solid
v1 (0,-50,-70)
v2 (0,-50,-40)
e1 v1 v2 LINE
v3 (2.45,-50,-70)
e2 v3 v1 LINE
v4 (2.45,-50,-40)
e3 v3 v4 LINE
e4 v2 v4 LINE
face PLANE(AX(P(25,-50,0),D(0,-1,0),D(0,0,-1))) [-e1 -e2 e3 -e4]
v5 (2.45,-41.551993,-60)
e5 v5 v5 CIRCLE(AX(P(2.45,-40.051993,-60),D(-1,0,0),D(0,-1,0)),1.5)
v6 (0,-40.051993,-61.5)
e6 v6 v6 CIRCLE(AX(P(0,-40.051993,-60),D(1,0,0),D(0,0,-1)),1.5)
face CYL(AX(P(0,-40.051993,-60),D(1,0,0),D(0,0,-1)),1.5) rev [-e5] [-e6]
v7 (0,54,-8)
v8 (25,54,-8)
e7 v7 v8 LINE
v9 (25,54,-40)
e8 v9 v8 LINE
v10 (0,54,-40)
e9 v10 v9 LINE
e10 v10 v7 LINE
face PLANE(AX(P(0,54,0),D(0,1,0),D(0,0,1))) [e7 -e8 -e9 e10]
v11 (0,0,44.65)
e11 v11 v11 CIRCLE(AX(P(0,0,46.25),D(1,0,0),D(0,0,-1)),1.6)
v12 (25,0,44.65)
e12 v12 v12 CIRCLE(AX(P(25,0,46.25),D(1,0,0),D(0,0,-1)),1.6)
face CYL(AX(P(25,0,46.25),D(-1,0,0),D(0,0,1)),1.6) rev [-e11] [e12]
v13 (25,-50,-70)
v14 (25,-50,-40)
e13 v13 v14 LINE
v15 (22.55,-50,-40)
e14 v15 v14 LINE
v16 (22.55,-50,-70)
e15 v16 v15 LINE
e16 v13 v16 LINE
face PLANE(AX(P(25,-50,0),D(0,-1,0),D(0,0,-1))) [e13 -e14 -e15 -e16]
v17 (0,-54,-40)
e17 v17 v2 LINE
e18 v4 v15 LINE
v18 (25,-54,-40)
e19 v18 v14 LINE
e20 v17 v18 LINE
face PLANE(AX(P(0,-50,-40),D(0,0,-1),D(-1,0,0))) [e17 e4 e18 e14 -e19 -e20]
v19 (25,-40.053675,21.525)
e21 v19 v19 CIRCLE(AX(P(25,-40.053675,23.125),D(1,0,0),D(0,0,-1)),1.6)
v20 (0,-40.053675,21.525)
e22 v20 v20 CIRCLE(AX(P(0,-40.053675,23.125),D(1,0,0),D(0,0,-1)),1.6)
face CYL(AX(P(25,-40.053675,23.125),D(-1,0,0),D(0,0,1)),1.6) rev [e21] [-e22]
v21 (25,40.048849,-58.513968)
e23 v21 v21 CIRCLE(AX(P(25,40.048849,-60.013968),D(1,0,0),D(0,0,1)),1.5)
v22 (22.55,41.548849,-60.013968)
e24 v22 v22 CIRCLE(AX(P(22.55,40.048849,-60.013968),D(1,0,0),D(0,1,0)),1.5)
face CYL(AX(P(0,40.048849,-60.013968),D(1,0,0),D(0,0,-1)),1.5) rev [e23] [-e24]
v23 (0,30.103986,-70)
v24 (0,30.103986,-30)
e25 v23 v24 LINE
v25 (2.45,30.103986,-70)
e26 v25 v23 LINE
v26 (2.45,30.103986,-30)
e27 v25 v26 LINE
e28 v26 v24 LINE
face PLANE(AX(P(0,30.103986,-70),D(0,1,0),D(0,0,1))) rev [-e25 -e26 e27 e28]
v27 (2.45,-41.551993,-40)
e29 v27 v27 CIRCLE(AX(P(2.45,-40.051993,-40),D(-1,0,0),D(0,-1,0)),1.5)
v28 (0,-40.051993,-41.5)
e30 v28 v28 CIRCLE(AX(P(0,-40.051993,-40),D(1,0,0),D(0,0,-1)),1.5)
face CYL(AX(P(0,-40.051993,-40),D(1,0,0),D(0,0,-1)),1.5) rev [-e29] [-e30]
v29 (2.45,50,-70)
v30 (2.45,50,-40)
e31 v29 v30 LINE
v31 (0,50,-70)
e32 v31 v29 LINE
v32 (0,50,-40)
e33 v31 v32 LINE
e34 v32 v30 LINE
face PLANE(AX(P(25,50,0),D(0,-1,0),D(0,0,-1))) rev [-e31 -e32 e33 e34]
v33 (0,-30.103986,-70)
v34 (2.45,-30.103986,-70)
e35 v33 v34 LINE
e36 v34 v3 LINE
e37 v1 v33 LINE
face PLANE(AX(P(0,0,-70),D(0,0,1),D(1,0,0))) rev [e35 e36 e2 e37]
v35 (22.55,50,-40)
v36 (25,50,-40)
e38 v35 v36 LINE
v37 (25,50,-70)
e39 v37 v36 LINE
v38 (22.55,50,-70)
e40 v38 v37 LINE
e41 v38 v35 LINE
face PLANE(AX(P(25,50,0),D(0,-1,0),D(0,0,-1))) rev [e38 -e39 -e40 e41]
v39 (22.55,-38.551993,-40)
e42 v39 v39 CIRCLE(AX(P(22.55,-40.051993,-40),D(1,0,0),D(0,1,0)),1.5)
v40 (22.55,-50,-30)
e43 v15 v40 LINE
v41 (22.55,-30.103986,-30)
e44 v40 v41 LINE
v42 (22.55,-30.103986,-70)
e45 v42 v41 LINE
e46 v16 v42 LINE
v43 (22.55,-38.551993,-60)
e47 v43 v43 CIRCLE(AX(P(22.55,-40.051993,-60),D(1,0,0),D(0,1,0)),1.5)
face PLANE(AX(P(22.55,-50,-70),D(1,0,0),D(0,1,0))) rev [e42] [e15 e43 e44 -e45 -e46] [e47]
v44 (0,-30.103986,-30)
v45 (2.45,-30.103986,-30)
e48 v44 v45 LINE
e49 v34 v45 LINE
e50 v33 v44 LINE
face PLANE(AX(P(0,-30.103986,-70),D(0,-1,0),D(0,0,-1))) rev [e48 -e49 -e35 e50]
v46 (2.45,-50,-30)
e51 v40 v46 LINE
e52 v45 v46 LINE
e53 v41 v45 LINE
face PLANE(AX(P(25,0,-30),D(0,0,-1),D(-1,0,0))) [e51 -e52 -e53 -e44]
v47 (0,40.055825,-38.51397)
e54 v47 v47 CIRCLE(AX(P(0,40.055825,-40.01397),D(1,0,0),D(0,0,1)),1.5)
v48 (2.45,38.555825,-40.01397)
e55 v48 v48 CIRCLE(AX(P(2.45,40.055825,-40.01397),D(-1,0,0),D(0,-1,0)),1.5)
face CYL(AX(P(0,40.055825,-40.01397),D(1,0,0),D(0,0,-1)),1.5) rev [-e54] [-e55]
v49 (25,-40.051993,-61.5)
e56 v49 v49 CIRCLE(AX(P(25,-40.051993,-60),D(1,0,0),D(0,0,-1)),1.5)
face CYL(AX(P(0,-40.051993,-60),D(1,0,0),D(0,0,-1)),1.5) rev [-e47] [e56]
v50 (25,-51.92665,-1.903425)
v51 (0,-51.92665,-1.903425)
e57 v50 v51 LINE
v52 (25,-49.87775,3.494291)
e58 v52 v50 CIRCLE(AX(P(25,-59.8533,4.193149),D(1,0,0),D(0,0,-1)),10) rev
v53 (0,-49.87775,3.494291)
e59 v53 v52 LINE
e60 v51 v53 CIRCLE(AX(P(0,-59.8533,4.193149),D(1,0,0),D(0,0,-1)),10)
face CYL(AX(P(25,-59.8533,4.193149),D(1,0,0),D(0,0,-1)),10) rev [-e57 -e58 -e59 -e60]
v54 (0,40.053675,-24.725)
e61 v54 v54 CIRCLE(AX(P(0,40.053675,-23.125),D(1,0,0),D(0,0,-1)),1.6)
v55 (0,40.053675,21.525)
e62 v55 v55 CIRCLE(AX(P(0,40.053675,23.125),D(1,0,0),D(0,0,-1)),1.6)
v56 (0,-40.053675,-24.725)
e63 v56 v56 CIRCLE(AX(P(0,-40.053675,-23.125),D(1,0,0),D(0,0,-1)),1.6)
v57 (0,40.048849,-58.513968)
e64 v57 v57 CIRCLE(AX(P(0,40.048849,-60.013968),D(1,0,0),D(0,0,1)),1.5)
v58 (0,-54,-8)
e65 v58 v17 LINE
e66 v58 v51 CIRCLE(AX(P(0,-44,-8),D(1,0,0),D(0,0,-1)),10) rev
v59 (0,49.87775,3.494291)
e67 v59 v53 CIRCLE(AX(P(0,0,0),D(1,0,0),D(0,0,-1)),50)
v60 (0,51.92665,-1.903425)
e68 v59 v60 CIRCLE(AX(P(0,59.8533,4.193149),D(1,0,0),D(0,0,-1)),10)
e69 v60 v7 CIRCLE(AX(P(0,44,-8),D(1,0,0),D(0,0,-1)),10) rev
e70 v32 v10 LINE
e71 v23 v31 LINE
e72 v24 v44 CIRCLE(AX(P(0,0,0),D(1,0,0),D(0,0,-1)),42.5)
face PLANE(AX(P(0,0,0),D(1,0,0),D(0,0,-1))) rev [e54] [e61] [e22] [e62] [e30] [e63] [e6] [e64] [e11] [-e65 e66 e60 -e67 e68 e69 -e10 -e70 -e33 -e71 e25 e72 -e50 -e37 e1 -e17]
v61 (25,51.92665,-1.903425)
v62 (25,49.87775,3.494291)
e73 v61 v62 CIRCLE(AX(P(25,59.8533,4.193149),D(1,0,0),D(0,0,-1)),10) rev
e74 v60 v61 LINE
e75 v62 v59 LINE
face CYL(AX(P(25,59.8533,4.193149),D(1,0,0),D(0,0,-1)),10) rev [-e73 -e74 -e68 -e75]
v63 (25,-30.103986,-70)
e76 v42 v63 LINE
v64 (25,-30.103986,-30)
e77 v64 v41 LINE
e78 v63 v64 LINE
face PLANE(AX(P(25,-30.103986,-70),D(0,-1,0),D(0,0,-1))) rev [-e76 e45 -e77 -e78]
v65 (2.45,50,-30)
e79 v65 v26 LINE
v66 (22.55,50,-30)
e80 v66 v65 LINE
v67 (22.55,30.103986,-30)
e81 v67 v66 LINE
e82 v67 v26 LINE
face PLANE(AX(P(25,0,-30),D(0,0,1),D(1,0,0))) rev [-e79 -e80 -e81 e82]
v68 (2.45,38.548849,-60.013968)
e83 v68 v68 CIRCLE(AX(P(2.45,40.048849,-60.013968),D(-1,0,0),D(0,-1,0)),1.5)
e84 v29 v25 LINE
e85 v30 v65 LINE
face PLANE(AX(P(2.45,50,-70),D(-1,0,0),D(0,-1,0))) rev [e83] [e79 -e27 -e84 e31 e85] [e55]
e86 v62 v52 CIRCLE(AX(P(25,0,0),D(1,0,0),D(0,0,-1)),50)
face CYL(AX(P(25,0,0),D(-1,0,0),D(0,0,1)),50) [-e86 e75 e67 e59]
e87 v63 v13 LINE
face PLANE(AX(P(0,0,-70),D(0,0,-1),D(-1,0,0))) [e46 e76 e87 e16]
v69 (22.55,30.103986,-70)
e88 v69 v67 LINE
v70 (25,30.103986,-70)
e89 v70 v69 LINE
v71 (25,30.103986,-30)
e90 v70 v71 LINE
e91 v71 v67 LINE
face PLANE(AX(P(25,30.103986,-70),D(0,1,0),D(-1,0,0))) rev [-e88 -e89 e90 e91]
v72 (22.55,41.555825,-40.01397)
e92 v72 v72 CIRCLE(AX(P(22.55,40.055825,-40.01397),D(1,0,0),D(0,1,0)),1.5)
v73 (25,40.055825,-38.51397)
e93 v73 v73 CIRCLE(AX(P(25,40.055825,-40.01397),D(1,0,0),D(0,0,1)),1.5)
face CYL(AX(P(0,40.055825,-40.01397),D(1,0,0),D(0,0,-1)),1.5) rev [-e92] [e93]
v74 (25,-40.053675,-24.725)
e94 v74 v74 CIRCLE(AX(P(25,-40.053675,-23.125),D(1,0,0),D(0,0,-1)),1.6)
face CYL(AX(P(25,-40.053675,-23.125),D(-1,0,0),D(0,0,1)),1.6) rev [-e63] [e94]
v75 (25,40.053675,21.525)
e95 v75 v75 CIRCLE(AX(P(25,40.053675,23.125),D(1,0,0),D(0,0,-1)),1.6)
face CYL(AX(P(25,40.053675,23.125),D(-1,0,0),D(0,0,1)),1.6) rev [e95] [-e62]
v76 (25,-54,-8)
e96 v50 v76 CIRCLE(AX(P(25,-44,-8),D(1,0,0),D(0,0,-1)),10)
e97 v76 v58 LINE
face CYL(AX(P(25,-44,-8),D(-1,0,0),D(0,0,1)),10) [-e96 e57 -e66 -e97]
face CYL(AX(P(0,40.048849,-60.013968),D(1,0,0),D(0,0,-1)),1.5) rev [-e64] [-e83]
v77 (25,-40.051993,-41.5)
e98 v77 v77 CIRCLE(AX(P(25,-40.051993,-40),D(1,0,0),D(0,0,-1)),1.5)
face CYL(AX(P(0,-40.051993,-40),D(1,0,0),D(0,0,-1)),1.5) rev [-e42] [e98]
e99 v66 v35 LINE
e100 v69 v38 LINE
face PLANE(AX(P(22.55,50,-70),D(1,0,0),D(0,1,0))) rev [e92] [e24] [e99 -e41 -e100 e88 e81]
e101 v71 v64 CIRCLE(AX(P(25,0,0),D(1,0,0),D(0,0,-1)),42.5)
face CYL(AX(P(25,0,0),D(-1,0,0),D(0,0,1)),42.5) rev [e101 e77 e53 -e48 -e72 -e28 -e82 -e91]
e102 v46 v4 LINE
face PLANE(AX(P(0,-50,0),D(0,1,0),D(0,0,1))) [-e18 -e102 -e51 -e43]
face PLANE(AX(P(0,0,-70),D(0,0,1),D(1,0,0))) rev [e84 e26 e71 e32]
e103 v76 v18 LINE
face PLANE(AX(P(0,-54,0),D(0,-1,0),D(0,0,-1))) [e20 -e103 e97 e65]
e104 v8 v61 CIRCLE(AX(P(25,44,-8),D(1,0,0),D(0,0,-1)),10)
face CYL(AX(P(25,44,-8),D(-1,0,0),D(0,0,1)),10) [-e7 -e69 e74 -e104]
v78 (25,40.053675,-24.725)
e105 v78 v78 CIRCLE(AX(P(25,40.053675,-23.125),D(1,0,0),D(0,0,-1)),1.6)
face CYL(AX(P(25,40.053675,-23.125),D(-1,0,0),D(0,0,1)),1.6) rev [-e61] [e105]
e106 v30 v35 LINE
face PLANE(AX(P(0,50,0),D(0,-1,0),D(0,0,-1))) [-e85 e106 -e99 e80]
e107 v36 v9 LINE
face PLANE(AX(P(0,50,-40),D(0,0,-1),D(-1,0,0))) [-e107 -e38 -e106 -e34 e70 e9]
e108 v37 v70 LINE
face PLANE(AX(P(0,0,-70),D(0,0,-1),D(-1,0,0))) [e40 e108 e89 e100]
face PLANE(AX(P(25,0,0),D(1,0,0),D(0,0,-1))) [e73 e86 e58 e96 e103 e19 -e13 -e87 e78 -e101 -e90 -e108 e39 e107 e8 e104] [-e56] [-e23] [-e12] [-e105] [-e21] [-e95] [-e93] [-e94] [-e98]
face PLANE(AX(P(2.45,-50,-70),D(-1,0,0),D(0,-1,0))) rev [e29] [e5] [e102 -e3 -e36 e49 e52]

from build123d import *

# Parameters (mm, degrees)
SKETCH_1_R          = 1.6
EXTRUDE_1_DEPTH     = 25
SKETCH_2_W          = 2.45
SKETCH_2_H          = 19.896013553
EXTRUDE_2_DEPTH     = 40
SKETCH_3_R          = 1.5
CUT_EXTRUDE_1_DEPTH = 90.582364336
SKETCH_4_W          = 40
SKETCH_4_H          = 4
EXTRUDE_3_DEPTH     = 25
FILLET_4_R          = 10
FILLET_5_R          = 10


with BuildPart() as part:
    # 草图1 → 凸台-拉伸1 (new body)
    # profile 1 of 2: a face of its own
    with BuildSketch(Plane(origin=(0, 0, 0), x_dir=(0, 0, -1), z_dir=(1, 0, 0))):
        with BuildLine():
            ThreePointArc((-47.85, 0), (-46.25, 1.6), (-44.65, 0))
            Line((-44.65, 0), (-42.5, 0))
            ThreePointArc((-42.5, 0), (-16.298006013, 39.25079617), (30, 30.103986447))
            Line((30, 30.103986447), (30, 50))
            Line((30, 50), (0, 50))
            ThreePointArc((0, 50), (-35.355339059, 35.355339059), (-50, 0))
            Line((-50, 0), (-47.85, 0))
        make_face()
        with Locations((-23.125, 40.053674925)):
            Circle(SKETCH_1_R, mode=Mode.SUBTRACT)
        with Locations((23.125, 40.053674925)):
            Circle(SKETCH_1_R, mode=Mode.SUBTRACT)
    # profile 2 of 2: a face of its own
    with BuildSketch(Plane(origin=(0, 0, 0), x_dir=(0, 0, -1), z_dir=(1, 0, 0))):
        with BuildLine():
            Line((-42.5, 0), (-44.65, 0))
            ThreePointArc((-44.65, 0), (-46.25, -1.6), (-47.85, 0))
            Line((-47.85, 0), (-50, 0))
            ThreePointArc((-50, 0), (-35.355339059, -35.355339059), (0, -50))
            Line((0, -50), (30, -50))
            Line((30, -50), (30, -30.103986447))
            ThreePointArc((30, -30.103986447), (-16.298006013, -39.25079617), (-42.5, 0))
        make_face()
        with Locations((-23.125, -40.053674925)):
            Circle(SKETCH_1_R, mode=Mode.SUBTRACT)
        with Locations((23.125, -40.053674925)):
            Circle(SKETCH_1_R, mode=Mode.SUBTRACT)
    extrude(amount=EXTRUDE_1_DEPTH)

    # 草图2 → 凸台-拉伸2 (add)
    with BuildSketch(Plane(origin=(0, 0, -30), x_dir=(-1, 0, 0), z_dir=(0, 0, -1))):
        with Locations((-23.775, 40.051993223)):
            Rectangle(SKETCH_2_W, SKETCH_2_H)
        with Locations((-1.225, 40.051993223)):
            Rectangle(SKETCH_2_W, SKETCH_2_H)
        with Locations((-1.225, -40.051993223)):
            Rectangle(SKETCH_2_W, SKETCH_2_H)
        with Locations((-23.775, -40.051993223)):
            Rectangle(SKETCH_2_W, SKETCH_2_H)
    extrude(amount=EXTRUDE_2_DEPTH)

    # 草图3 → 切除-拉伸1 (cut, through all)
    with BuildSketch(Plane(origin=(25, 0, 0), x_dir=(0, 0, -1), z_dir=(1, 0, 0))):
        with Locations((60, -40.051993223)):
            Circle(SKETCH_3_R)
        with Locations((40, -40.051993223)):
            Circle(SKETCH_3_R)
        with Locations(Location((40.013969679, 40.055824631, 0), (0, 0, 270))):
            Circle(SKETCH_3_R)
        with Locations(Location((60.013968462, 40.048849193, 0), (0, 0, 270))):
            Circle(SKETCH_3_R)
    extrude(amount=-CUT_EXTRUDE_1_DEPTH, mode=Mode.SUBTRACT)

    # 草图4 → 凸台-拉伸3 (add)
    with BuildSketch(Plane(origin=(25, 0, 0), x_dir=(0, 0, -1), z_dir=(1, 0, 0))):
        with Locations((20, 52)):
            Rectangle(SKETCH_4_W, SKETCH_4_H)
        with Locations((20, -52)):
            Rectangle(SKETCH_4_W, SKETCH_4_H)
    extrude(amount=-EXTRUDE_3_DEPTH)

    # 圆角4
    # the kernel refuses this fillet: 10 mm, written as the material it takes off along each edge
    with BuildSketch(Plane(origin=(45, -54, 0), x_dir=(0, 0, -1), z_dir=(-1, 0, 0))) as fillet_4_piece_1:
        with BuildLine():
            CenterArc((8, -10), FILLET_4_R, 90, 53.130102354)
            Line((0, -4), (-0.16, -3.88))
            ThreePointArc((-0.16, -3.88), (-0.2, -2), (-0.2, 0))
            Line((-0.2, 0), (0, 0.2))
            Line((0, 0.2), (8, 0.2))
            Line((8, 0.2), (8, 0))
        make_face()
    extrude(amount=65, mode=Mode.SUBTRACT)
    with BuildSketch(Plane(origin=(45, 54, 0), x_dir=(0, 0, -1), z_dir=(-1, 0, 0))) as fillet_4_piece_2:
        with BuildLine():
            CenterArc((8, 10), FILLET_4_R, 216.869897646, 53.130102354)
            Line((0, 4), (-0.16, 3.88))
            ThreePointArc((-0.16, 3.88), (-0.2, 2), (-0.2, 0))
            Line((-0.2, 0), (0, -0.2))
            Line((0, -0.2), (8, -0.2))
            Line((8, -0.2), (8, 0))
        make_face()
    extrude(amount=65, mode=Mode.SUBTRACT)

    # 圆角5
    fillet_5_edges = [part.edges().sort_by_distance(p)[0] for p in [
        (12.5, -50, 0),
        (12.5, 50, 0),
    ]]
    fillet(fillet_5_edges, radius=FILLET_5_R)


solid = part.part
